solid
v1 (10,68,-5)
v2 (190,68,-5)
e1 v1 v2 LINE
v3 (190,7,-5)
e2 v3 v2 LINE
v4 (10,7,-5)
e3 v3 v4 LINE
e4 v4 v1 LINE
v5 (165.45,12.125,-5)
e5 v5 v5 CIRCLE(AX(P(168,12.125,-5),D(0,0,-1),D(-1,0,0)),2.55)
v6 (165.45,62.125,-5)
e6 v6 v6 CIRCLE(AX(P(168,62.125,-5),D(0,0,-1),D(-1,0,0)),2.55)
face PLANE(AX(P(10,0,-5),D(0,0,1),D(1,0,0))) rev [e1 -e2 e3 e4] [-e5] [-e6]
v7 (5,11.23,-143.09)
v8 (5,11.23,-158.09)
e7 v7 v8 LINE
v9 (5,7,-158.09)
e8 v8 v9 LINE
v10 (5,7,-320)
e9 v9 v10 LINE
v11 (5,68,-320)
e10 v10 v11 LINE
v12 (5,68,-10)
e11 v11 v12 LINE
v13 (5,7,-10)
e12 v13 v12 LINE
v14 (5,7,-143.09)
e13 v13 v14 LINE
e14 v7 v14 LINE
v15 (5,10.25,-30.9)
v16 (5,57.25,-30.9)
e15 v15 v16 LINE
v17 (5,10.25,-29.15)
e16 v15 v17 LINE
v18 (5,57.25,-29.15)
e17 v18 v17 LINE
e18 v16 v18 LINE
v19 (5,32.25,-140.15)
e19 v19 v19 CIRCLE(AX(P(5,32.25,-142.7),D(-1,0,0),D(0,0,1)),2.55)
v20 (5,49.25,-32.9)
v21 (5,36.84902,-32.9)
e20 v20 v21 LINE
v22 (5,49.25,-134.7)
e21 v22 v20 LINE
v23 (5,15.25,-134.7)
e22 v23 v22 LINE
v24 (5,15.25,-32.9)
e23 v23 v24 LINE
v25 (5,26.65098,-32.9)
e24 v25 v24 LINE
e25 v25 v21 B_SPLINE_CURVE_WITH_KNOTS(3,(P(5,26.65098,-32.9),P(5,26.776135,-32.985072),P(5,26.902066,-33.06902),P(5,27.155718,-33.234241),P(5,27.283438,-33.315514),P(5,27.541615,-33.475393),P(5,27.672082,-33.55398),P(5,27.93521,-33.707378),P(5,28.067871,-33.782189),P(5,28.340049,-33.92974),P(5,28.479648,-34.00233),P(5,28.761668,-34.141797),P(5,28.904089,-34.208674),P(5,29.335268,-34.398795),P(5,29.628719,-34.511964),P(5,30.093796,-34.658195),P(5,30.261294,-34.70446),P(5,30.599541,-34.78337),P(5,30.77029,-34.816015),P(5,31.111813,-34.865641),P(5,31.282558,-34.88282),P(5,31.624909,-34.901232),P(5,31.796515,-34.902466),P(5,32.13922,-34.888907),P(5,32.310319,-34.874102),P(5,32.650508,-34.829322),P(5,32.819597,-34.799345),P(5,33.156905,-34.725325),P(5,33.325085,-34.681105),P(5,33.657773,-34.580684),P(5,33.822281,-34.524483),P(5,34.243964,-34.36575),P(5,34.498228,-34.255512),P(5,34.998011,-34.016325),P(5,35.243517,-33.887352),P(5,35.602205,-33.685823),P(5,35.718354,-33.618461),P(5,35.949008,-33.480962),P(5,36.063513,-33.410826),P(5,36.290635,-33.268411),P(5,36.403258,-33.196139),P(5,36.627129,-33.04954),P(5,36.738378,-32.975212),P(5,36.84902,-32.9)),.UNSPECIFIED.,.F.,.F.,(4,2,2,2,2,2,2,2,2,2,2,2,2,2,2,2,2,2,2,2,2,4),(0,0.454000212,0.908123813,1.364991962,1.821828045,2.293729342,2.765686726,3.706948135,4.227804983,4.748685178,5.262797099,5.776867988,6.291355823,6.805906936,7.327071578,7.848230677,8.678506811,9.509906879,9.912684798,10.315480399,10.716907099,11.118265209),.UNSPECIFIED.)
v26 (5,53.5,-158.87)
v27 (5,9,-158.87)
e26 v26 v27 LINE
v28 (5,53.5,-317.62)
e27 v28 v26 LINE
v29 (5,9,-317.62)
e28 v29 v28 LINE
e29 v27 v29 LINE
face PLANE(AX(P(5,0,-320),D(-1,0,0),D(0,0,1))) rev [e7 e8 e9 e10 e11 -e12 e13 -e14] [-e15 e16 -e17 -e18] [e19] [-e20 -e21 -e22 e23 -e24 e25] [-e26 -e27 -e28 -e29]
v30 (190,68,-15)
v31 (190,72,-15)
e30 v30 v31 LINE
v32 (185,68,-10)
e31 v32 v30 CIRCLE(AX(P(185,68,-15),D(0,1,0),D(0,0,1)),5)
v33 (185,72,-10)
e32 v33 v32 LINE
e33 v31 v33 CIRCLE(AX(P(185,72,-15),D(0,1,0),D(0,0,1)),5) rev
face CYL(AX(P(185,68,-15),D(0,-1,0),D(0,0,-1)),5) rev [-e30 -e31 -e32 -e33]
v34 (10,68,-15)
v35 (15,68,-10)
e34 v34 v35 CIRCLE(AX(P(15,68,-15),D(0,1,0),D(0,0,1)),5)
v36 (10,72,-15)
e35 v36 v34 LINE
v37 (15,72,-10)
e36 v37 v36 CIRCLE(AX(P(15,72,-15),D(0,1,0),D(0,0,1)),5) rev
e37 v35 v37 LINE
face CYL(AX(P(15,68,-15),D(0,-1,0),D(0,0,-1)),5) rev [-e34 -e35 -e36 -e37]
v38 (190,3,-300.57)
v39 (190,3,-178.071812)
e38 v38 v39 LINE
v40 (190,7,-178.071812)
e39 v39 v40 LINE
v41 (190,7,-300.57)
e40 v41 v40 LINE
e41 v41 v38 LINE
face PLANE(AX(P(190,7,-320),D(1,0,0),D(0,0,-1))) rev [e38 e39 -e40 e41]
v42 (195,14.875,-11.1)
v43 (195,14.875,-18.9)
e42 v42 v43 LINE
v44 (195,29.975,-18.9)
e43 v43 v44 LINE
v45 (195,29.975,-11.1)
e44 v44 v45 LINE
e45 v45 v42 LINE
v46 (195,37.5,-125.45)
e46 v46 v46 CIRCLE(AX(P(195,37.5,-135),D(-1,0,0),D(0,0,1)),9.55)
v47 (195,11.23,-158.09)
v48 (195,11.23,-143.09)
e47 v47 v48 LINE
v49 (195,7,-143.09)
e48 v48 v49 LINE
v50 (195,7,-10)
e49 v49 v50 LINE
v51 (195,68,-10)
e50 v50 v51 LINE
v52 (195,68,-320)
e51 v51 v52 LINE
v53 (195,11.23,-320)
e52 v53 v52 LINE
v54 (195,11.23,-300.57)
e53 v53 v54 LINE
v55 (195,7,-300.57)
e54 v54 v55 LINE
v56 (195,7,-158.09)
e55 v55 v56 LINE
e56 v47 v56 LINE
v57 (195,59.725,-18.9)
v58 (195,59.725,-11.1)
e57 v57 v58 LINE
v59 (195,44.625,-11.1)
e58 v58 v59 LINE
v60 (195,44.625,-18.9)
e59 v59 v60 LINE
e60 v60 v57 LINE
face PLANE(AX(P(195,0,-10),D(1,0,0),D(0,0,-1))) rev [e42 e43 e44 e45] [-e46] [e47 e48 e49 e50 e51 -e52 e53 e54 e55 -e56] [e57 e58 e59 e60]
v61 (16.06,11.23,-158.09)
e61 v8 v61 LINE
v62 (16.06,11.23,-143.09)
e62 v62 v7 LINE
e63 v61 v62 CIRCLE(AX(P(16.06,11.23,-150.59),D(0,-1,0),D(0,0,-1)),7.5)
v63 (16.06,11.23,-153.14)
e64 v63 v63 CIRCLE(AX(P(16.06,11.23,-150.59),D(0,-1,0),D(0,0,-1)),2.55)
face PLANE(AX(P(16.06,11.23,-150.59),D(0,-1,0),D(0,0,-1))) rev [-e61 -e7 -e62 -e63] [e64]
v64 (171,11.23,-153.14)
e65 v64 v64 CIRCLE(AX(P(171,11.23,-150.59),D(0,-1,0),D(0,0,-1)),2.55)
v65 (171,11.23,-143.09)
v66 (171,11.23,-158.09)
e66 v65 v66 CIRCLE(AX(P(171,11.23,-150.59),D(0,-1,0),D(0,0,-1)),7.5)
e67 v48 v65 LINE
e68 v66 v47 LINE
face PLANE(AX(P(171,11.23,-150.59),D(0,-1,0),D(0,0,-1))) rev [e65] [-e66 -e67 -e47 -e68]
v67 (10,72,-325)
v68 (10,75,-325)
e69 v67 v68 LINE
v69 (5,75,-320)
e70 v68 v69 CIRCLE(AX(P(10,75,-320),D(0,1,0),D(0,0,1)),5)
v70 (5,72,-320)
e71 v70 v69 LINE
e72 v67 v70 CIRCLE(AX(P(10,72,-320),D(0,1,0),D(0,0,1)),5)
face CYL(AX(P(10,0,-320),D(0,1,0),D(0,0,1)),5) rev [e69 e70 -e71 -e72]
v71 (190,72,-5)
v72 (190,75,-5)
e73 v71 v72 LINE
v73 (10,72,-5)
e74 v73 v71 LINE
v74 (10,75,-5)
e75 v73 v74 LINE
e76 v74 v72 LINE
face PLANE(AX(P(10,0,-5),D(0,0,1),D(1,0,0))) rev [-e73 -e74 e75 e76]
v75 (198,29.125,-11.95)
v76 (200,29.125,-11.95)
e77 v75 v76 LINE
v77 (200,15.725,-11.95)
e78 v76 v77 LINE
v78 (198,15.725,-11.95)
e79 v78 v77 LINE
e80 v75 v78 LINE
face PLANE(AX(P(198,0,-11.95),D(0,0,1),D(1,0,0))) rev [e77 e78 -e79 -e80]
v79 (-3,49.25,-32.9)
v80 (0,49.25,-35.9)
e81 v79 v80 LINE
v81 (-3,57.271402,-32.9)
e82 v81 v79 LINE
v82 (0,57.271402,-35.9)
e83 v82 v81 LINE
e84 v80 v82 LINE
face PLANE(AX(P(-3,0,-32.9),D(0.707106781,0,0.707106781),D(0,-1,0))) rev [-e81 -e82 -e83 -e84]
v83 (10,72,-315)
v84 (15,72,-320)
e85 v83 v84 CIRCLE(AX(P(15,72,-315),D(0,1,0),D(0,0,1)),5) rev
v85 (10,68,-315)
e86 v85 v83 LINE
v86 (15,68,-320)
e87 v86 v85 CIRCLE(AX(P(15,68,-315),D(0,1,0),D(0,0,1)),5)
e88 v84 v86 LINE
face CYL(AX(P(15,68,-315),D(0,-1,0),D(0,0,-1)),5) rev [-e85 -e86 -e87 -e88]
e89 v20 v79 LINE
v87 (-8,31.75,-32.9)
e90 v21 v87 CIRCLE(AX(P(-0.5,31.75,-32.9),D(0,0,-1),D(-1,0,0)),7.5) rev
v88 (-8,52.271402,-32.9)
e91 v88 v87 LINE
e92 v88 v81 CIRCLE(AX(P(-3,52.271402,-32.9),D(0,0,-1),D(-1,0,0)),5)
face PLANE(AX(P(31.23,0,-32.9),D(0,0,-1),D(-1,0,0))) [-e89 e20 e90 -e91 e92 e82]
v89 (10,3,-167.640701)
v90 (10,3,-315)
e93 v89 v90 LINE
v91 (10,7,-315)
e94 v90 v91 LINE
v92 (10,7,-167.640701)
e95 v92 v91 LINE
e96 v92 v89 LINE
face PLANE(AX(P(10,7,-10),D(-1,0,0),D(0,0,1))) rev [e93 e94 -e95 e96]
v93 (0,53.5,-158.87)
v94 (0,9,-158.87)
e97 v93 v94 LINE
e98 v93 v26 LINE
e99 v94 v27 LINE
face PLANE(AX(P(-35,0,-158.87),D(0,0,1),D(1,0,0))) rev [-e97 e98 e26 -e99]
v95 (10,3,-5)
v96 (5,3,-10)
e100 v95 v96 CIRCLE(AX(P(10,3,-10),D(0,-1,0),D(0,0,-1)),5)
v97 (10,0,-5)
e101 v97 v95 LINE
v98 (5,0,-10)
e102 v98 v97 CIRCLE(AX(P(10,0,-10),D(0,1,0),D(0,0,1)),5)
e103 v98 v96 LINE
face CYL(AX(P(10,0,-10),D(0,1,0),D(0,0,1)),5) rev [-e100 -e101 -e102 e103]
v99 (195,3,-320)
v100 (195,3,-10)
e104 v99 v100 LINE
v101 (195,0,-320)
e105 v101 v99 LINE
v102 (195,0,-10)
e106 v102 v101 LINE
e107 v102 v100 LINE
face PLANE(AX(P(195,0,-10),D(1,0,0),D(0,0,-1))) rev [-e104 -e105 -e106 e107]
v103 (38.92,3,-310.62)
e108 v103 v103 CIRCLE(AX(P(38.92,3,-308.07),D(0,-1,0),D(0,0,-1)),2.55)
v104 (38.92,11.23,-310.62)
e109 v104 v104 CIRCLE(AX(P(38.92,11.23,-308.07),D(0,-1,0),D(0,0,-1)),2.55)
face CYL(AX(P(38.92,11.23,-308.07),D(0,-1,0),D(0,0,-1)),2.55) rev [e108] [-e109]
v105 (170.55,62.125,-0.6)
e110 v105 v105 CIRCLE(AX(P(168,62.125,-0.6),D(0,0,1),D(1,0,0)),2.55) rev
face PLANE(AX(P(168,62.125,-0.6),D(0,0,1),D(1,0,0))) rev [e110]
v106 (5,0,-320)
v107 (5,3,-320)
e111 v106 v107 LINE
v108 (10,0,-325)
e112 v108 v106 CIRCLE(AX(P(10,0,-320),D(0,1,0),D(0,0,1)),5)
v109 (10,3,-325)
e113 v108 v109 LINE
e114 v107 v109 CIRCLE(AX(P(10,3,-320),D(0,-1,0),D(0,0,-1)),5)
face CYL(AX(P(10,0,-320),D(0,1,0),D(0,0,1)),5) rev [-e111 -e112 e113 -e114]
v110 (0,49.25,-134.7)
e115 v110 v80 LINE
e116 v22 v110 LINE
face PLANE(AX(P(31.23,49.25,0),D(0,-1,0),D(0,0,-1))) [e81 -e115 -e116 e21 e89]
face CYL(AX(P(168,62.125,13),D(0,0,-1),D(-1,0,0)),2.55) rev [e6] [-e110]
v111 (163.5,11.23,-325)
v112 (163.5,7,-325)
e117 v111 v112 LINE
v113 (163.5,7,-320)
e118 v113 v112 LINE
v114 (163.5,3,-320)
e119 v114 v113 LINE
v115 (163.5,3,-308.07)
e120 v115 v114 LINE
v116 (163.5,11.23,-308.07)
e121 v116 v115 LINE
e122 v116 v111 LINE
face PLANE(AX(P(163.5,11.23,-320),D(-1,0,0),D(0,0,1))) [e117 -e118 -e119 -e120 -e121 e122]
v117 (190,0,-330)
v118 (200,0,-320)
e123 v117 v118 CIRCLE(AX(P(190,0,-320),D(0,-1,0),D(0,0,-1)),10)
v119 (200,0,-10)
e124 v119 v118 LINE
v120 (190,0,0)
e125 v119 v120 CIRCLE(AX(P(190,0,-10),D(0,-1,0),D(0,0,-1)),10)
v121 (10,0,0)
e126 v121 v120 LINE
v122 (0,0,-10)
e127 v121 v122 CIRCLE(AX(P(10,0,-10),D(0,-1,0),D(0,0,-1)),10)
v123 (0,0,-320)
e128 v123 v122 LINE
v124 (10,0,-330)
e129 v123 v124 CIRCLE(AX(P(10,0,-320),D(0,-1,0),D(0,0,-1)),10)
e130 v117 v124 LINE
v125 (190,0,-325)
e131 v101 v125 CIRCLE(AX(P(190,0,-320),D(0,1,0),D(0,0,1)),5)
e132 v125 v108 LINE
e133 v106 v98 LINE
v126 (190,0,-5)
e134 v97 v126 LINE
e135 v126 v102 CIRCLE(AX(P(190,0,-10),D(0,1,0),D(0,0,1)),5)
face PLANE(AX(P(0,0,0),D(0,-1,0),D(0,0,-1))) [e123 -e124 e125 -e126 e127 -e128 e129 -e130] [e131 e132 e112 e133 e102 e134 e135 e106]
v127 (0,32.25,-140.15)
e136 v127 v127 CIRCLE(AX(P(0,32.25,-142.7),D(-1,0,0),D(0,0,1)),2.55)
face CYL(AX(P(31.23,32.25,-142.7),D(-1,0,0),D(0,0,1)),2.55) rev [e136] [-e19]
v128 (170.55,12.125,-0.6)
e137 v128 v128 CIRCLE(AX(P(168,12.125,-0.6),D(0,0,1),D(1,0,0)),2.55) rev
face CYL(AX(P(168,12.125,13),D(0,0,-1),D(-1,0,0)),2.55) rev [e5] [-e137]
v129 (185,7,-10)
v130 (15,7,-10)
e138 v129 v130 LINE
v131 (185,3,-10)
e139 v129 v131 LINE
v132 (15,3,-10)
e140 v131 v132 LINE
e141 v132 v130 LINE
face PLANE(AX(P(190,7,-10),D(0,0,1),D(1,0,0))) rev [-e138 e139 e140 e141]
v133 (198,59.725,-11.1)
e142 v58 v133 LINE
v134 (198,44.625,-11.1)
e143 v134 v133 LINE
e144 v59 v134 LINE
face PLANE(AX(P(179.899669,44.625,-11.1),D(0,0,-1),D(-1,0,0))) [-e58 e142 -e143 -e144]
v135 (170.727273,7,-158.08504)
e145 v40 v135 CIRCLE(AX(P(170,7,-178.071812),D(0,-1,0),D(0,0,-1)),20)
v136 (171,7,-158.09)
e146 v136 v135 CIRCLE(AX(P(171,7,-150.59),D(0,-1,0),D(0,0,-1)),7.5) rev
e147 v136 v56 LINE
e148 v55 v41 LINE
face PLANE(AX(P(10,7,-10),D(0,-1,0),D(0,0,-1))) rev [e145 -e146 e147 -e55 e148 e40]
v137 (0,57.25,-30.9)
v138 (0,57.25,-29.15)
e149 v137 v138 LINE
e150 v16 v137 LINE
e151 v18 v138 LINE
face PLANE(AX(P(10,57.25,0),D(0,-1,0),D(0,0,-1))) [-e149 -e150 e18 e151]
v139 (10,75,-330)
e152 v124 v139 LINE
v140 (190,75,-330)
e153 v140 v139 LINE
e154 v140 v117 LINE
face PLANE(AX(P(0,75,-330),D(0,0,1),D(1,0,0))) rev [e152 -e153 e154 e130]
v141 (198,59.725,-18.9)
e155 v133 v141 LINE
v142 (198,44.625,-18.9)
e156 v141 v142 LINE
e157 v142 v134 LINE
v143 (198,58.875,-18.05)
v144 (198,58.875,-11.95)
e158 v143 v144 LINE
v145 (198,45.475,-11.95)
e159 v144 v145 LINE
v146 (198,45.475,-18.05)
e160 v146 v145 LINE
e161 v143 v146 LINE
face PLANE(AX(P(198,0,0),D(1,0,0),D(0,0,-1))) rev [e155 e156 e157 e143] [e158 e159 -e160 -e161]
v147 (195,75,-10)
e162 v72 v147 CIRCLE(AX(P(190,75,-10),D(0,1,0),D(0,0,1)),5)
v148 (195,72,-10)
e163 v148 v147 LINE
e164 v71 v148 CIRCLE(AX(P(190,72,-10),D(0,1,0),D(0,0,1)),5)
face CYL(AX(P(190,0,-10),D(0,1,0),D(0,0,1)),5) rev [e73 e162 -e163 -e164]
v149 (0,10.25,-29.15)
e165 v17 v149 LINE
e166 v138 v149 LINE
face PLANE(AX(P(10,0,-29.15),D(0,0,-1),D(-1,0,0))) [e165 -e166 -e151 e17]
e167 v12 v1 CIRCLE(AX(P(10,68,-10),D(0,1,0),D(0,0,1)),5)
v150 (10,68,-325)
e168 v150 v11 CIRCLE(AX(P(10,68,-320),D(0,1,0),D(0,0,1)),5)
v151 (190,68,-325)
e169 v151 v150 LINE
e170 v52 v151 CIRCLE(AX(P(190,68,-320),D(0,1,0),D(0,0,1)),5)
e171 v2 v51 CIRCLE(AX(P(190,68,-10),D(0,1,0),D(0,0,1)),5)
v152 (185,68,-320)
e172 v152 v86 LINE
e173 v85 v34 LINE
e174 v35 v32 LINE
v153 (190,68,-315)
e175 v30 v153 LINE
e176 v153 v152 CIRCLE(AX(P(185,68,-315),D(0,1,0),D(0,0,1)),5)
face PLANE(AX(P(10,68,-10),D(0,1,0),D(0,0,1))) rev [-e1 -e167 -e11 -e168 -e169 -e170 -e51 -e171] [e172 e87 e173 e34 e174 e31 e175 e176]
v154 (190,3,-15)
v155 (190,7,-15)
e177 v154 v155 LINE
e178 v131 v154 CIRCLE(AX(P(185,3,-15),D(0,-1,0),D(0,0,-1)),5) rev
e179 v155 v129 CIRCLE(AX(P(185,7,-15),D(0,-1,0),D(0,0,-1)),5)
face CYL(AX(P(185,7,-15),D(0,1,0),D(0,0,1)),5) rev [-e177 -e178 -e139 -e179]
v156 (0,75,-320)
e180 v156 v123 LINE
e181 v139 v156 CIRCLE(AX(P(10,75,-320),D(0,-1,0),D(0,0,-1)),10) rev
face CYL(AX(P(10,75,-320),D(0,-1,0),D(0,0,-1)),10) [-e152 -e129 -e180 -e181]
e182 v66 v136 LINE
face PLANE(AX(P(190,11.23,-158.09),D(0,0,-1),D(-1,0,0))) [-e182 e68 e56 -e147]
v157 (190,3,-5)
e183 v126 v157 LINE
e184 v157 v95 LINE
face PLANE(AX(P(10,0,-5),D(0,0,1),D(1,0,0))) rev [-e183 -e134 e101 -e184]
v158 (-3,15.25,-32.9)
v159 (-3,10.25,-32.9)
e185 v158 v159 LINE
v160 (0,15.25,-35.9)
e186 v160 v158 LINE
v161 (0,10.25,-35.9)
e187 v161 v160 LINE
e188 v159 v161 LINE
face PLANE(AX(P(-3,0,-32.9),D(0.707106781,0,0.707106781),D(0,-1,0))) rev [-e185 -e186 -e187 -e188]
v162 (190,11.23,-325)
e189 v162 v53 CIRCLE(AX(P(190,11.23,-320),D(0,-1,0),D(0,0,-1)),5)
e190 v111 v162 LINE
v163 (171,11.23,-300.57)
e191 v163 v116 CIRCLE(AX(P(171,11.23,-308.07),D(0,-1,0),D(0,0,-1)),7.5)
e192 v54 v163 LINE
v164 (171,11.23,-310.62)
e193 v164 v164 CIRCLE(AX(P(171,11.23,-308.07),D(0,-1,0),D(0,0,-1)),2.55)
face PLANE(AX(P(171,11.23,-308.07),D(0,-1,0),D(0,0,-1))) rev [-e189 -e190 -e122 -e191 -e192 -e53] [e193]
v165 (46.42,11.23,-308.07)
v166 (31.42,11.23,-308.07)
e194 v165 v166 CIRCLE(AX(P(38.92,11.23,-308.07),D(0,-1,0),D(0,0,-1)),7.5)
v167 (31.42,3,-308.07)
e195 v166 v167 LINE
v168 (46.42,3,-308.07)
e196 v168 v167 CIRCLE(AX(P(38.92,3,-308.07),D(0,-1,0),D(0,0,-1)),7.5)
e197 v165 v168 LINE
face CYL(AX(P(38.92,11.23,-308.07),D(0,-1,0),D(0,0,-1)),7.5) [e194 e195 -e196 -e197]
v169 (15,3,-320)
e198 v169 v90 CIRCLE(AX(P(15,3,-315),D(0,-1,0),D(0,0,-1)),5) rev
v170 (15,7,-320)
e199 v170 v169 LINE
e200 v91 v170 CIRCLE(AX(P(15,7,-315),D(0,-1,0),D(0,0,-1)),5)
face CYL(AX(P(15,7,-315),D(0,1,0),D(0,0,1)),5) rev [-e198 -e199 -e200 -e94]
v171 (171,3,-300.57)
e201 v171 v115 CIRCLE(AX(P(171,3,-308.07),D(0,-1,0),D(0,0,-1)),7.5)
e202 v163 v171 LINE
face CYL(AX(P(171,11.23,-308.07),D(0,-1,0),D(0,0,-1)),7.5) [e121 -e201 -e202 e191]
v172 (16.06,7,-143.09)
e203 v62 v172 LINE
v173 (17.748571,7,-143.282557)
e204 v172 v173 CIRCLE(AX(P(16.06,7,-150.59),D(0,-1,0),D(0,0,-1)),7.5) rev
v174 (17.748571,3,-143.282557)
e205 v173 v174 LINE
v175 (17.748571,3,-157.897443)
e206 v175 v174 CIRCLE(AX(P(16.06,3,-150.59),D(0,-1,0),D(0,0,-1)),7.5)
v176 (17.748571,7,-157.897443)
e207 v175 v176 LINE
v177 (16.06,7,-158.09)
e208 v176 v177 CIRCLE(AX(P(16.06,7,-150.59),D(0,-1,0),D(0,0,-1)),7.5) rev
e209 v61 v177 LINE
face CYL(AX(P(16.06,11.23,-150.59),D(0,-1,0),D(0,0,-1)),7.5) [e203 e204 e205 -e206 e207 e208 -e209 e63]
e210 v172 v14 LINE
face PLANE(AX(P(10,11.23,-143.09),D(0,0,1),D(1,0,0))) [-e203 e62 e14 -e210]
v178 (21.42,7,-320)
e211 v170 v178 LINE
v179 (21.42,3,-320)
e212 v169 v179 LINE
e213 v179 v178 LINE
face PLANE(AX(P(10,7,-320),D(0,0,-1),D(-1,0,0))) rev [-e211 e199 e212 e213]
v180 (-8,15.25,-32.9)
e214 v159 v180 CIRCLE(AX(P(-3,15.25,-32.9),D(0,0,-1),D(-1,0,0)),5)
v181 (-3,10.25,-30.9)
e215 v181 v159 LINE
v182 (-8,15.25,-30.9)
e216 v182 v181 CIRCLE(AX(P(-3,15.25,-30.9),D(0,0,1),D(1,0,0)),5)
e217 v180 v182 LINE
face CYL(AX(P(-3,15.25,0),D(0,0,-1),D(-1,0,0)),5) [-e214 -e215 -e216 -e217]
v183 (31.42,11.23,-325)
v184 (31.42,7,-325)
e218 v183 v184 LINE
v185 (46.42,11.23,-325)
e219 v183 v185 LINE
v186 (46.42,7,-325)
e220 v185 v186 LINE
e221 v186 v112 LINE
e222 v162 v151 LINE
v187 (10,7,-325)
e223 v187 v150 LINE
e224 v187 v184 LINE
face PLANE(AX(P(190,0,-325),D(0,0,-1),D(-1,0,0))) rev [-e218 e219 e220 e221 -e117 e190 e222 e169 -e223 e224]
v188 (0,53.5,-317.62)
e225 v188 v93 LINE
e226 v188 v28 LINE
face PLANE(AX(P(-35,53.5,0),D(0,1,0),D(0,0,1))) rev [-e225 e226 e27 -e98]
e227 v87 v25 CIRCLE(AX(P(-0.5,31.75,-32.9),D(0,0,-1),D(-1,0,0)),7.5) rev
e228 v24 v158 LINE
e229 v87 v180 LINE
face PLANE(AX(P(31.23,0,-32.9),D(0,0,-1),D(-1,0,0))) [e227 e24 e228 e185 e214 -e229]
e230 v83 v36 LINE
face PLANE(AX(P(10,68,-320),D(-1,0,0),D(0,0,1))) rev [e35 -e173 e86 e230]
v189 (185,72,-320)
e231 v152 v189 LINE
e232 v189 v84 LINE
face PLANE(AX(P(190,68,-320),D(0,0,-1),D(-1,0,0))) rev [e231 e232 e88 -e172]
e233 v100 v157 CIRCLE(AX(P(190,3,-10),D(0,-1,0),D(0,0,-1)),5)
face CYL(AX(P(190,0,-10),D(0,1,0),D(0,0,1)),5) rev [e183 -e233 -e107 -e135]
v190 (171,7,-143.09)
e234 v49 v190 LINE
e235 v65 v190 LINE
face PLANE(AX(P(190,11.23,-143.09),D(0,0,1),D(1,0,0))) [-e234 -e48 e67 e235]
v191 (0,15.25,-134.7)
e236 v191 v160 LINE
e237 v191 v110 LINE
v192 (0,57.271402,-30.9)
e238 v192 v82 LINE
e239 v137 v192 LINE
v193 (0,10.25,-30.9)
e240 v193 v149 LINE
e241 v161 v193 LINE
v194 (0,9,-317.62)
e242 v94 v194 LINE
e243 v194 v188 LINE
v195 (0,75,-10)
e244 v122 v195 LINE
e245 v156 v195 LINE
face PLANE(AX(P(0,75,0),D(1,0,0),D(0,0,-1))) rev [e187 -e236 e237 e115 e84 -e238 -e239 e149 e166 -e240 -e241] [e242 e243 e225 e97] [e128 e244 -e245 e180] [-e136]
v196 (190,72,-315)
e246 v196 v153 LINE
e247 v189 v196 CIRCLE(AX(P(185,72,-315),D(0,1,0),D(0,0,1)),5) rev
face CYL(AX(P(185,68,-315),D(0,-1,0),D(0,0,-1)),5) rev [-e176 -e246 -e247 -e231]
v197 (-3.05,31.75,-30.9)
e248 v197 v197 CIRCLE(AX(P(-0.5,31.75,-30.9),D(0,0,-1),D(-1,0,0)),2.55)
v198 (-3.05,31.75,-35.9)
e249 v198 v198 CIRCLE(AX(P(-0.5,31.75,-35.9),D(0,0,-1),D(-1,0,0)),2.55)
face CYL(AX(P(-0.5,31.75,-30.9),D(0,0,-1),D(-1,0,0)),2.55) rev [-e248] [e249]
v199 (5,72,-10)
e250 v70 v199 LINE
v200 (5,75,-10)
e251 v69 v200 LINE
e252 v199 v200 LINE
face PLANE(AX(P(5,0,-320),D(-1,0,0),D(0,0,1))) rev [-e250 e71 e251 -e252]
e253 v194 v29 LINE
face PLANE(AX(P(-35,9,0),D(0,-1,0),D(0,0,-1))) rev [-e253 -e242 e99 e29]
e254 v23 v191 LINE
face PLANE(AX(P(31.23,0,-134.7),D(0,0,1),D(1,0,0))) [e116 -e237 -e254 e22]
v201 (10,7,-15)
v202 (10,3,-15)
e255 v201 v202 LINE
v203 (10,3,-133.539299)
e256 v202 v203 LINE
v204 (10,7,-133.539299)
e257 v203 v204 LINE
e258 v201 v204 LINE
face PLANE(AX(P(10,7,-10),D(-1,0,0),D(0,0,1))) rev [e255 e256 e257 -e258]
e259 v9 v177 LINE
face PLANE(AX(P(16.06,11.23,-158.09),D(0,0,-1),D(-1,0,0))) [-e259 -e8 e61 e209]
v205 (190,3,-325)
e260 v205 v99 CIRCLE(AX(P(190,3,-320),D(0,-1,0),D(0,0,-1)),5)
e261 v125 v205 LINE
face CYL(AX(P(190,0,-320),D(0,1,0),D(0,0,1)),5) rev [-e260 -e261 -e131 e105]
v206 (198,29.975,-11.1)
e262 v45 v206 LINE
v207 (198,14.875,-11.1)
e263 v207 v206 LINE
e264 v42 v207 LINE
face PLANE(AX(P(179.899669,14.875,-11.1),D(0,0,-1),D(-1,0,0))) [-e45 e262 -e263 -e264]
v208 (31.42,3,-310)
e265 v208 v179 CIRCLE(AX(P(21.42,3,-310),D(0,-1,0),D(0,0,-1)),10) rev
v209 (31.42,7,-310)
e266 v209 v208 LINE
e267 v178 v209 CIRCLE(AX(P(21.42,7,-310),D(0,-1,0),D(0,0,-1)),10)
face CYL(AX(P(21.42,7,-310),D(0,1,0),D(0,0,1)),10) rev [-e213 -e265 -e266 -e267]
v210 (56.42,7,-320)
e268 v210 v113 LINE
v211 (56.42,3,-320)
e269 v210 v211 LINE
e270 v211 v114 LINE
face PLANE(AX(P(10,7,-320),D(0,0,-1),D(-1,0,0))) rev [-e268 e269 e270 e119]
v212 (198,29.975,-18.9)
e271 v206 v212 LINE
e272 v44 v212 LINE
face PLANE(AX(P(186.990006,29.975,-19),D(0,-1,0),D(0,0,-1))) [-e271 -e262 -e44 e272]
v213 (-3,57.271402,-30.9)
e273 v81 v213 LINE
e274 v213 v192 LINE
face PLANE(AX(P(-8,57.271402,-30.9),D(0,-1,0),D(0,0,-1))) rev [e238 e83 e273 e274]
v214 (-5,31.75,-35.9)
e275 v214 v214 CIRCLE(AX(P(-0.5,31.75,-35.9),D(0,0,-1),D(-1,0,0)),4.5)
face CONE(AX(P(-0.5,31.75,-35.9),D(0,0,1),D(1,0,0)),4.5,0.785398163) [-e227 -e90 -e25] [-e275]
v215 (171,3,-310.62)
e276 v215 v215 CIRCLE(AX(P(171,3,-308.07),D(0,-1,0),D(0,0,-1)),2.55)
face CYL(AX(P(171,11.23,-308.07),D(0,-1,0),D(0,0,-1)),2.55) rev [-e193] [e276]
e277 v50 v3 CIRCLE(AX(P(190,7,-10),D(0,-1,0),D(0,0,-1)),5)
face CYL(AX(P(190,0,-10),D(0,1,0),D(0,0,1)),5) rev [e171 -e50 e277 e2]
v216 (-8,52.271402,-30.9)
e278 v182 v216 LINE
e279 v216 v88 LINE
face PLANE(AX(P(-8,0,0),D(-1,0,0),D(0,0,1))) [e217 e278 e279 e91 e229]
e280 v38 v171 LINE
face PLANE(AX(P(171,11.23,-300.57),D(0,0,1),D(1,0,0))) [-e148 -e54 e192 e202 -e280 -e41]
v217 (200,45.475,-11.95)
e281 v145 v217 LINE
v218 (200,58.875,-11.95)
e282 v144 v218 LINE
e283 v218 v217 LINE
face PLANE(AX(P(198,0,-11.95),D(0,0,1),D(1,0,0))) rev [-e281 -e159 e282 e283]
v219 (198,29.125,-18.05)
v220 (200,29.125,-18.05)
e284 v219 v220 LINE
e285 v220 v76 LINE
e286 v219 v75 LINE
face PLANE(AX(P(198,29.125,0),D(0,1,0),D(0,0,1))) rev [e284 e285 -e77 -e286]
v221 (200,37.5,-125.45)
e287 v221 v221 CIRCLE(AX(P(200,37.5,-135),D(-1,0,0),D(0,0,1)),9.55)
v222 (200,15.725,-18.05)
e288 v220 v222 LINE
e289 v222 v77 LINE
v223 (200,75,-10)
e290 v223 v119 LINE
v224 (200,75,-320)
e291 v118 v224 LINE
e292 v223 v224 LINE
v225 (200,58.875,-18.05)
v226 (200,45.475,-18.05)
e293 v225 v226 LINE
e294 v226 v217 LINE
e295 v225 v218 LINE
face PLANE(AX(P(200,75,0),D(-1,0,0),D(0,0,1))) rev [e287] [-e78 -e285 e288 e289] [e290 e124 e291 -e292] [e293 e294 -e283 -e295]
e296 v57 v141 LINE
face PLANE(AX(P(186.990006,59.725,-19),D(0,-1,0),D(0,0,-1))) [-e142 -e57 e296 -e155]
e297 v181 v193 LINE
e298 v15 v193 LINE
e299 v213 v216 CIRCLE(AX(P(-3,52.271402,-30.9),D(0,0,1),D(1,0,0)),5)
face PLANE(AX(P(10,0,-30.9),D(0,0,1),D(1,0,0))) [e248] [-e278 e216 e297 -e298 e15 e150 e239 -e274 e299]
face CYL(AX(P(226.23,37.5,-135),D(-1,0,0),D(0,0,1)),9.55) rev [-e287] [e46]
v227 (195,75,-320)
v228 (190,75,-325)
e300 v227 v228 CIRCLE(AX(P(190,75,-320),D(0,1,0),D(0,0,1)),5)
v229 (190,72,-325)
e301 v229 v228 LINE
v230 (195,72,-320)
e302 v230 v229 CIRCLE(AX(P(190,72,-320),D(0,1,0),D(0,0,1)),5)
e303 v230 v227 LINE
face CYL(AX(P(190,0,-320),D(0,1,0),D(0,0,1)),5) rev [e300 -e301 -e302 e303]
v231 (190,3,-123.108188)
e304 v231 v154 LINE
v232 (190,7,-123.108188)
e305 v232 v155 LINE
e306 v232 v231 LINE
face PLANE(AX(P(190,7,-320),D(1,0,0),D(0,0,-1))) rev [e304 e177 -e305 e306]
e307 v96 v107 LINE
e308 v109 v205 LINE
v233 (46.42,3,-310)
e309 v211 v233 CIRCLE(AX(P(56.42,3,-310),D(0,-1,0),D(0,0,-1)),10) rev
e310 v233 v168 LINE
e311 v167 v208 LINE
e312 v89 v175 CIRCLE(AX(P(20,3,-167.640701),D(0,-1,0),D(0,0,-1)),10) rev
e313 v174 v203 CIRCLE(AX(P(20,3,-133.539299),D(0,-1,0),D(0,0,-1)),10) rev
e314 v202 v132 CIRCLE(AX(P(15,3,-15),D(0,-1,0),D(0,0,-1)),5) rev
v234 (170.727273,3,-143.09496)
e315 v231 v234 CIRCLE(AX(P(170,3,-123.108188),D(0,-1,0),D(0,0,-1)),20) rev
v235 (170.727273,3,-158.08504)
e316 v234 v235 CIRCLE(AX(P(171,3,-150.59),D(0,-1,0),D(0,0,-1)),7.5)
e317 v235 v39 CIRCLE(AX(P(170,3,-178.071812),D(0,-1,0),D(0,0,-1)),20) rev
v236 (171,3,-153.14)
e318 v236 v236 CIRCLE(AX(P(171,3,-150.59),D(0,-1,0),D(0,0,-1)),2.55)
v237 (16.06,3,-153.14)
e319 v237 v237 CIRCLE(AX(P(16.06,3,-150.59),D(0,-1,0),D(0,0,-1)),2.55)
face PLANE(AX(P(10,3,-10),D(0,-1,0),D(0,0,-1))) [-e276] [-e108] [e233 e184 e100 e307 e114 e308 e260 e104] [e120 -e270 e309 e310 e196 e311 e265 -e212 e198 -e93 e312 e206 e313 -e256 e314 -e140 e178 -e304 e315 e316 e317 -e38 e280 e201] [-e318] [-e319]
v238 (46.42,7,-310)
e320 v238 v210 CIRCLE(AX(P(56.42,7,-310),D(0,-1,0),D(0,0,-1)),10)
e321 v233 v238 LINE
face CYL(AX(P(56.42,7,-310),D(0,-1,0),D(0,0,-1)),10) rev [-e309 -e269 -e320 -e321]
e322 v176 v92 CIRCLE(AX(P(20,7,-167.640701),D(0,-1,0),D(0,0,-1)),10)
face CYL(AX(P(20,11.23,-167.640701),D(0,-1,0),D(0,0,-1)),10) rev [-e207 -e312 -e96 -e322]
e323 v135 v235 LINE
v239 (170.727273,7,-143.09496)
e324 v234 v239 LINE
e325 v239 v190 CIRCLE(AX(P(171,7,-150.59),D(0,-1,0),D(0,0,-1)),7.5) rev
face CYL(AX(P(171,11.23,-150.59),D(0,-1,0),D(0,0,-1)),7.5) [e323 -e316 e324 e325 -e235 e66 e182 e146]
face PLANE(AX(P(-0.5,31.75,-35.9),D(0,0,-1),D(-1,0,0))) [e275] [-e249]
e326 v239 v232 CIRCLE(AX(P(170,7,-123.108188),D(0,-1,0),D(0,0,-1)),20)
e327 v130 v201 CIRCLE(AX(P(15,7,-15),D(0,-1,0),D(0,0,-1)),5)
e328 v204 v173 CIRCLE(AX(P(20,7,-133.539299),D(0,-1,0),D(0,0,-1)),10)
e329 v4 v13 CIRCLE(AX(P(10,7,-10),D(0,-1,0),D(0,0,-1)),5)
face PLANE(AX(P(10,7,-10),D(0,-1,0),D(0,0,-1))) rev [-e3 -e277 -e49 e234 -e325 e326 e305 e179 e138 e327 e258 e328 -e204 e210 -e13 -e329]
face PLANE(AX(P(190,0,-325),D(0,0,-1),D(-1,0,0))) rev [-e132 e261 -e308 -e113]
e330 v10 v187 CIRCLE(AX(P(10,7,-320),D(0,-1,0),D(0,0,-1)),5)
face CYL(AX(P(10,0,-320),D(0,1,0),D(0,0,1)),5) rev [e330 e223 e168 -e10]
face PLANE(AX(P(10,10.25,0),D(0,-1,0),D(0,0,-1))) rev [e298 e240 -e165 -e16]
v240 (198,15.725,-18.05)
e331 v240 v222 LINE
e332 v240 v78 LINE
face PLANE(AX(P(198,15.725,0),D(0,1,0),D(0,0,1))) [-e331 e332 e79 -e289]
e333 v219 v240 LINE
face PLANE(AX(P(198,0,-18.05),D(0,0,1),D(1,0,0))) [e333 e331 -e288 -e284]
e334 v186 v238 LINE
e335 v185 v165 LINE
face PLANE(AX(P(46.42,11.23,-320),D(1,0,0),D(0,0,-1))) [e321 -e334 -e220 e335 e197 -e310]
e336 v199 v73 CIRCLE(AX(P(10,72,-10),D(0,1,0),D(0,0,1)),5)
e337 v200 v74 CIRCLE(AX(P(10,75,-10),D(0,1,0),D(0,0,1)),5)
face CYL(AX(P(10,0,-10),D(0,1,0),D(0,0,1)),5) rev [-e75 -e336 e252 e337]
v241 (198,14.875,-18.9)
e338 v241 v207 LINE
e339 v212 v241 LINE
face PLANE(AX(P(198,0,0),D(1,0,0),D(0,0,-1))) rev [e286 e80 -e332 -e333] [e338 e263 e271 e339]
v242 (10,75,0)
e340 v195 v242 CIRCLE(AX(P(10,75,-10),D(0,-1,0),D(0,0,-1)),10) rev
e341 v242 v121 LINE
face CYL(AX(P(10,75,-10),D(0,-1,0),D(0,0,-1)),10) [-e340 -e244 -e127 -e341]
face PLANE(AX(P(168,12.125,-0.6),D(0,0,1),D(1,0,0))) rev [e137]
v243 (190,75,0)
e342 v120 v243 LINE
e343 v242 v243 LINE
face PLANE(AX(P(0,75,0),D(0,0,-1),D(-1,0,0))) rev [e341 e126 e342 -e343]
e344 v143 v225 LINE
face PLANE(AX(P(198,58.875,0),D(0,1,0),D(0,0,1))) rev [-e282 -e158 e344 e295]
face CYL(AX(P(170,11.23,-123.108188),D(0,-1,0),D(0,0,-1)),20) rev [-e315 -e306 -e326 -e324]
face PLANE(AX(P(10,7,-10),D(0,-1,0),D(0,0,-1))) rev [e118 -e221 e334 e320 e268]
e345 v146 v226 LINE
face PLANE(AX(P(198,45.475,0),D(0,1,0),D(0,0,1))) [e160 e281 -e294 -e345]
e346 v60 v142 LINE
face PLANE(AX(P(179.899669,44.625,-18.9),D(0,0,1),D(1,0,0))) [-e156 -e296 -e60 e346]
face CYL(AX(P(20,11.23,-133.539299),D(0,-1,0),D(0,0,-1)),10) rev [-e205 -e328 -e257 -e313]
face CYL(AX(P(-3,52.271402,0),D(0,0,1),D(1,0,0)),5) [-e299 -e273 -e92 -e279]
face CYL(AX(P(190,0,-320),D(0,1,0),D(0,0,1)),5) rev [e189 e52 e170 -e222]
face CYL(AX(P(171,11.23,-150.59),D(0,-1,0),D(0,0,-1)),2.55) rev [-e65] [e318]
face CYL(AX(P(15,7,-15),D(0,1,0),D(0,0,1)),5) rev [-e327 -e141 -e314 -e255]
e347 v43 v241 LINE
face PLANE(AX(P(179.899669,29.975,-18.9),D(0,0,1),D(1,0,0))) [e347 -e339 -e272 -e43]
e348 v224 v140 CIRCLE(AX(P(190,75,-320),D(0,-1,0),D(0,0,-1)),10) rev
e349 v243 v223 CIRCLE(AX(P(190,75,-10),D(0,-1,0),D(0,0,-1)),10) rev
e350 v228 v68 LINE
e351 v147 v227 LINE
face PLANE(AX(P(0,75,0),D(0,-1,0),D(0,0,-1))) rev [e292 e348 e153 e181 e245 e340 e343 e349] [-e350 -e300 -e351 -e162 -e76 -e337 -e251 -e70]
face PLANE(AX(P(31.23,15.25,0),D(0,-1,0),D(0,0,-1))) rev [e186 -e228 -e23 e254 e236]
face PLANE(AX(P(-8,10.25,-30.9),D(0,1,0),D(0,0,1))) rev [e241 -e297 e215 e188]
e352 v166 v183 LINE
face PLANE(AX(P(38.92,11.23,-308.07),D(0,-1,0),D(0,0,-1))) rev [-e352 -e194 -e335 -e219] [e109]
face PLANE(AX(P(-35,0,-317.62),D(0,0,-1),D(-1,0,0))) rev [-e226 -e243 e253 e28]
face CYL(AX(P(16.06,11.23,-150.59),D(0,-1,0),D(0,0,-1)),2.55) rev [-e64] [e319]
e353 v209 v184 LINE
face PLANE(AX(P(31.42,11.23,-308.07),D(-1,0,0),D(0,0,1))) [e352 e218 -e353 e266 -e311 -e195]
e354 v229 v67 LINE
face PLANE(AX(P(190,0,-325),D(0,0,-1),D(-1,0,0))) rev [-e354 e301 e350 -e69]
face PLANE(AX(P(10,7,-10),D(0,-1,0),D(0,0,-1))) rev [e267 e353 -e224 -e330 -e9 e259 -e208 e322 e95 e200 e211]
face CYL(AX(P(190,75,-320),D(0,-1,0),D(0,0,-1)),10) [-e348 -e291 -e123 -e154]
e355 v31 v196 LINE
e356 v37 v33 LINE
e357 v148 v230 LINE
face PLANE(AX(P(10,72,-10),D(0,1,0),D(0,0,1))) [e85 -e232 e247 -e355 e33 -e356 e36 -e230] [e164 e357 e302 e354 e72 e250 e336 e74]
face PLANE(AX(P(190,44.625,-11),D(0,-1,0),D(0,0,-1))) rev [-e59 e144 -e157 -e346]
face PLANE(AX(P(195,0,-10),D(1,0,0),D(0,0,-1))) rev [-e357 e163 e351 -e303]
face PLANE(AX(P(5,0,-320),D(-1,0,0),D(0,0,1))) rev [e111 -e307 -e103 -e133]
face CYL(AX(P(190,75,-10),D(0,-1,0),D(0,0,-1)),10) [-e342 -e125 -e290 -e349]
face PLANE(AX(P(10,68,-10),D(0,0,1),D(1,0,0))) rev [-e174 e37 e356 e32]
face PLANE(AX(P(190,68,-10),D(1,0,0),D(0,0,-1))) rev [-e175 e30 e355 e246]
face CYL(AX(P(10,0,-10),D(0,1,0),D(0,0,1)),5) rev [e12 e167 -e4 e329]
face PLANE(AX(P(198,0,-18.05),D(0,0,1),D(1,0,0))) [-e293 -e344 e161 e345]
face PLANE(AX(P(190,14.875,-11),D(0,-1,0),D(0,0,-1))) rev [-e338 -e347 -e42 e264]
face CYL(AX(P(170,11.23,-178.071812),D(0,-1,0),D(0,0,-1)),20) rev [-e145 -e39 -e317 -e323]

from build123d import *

# Parameters (mm, degrees)
SKETCH1_W            = 200
SKETCH1_H            = 330
BOSS_EXTRUDE1_DEPTH  = 75
FILLET1_R            = 10
CUT_EXTRUDE1_DEPTH   = 75
SKETCH3_W            = 180
SKETCH3_H            = 310
BOSS_EXTRUDE2_DEPTH  = 4
BOSS_EXTRUDE3_START  = -4
SKETCH4_W            = 180
SKETCH4_H            = 310
BOSS_EXTRUDE3_DEPTH  = 4
SKETCH8_W            = 158.75
SKETCH8_H            = 44.5
CUT_EXTRUDE2_DEPTH   = 40
BOSS_EXTRUDE4_START  = -8.23
SKETCH11_R           = 2.55
BOSS_EXTRUDE4_DEPTH  = 8.23
SKETCH12_R           = 2.55
SKETCH12_W           = 101.8
SKETCH12_H           = 34
CUT_EXTRUDE3_DEPTH   = 31.23
SKETCH13_R           = 9.55
CUT_EXTRUDE4_DEPTH   = 31.23
FILLET2_R            = 10
FILLET3_R            = 20
FILLET4_R            = 5
CUT_EXTRUDE5_DEPTH   = 10
SKETCH15_W           = 2
SKETCH15_H           = 47.02140159
BOSS_EXTRUDE5_DEPTH  = 8
SKETCH16_R           = 2.55
CUT_EXTRUDE6_DEPTH   = 2
BOSS_EXTRUDE6_START  = 3
SKETCH17_R           = 4.5
SKETCH17_R_2         = 2.55
BOSS_EXTRUDE6_DEPTH  = 3
CHAMFER1_SIZE        = 3
FILLET5_R            = 5
CHAMFER2_SIZE        = 3
SKETCH19_W           = 7
SKETCH19_H           = 14.5
CUT_EXTRUDE8_DEPTH   = 18
SKETCH22_W           = 7
SKETCH22_H           = 0.375
CUT_EXTRUDE9_DEPTH   = 18
SKETCH23_W           = 7
SKETCH23_H           = 0.375
BOSS_EXTRUDE7_DEPTH  = 5
SKETCH20_R           = 2.55
CUT_EXTRUDE10_DEPTH  = 18
SKETCH24_W           = 8
SKETCH24_H           = 15.5
CUT_EXTRUDE12_DEPTH  = 10
SKETCH25_W           = 8
SKETCH25_H           = 0.4
BOSS_EXTRUDE8_DEPTH  = 5
SKETCH26_W           = 0.1
SKETCH26_H           = 15.1
BOSS_EXTRUDE9_DEPTH  = 5
BOSS_EXTRUDE10_DEPTH = 2
SKETCH28_W           = 12.985784693
SKETCH28_H           = 10.415883014
BOSS_EXTRUDE11_DEPTH = 5
BOSS_EXTRUDE12_START = -0.6
SKETCH29_R           = 2.55
BOSS_EXTRUDE12_DEPTH = 0.6


with BuildPart() as part:
    # Sketch1 → Boss-Extrude1 (new body)
    with BuildSketch(Plane(origin=(0, 0, 0), x_dir=(1, 0, 0), z_dir=(0, 1, 0))):
        with Locations((100, 165)):
            Rectangle(SKETCH1_W, SKETCH1_H)
    extrude(amount=BOSS_EXTRUDE1_DEPTH)

    # Fillet1
    fillet1_edges = [part.edges().sort_by_distance(p)[0] for p in [
        (0, 37.5, -330),
        (200, 37.5, -330),
        (200, 37.5, 0),
        (0, 37.5, 0),
    ]]
    fillet(fillet1_edges, radius=FILLET1_R)

    # Sketch2 → Cut-Extrude1 (cut)
    with BuildSketch(Plane(origin=(0, 75, 0), x_dir=(1, 0, 0), z_dir=(0, 1, 0))):
        with BuildLine():
            Line((190, 325), (10, 325))
            ThreePointArc((10, 325), (6.464466094, 323.535533906), (5, 320))
            Line((5, 320), (5, 10))
            ThreePointArc((5, 10), (6.464466094, 6.464466094), (10, 5))
            Line((10, 5), (190, 5))
            ThreePointArc((190, 5), (193.535533906, 6.464466094), (195, 10))
            Line((195, 10), (195, 320))
            ThreePointArc((195, 320), (193.535533906, 323.535533906), (190, 325))
        make_face()
    extrude(amount=-CUT_EXTRUDE1_DEPTH, mode=Mode.SUBTRACT)

    # Sketch3 → Boss-Extrude2 (add)
    with BuildSketch(Plane(origin=(0, 72, 0), x_dir=(1, 0, 0), z_dir=(0, 1, 0))):
        with BuildLine():
            Line((10, 5), (190, 5))
            ThreePointArc((190, 5), (193.535533906, 6.464466094), (195, 10))
            Line((195, 10), (195, 320))
            ThreePointArc((195, 320), (193.535533906, 323.535533906), (190, 325))
            Line((190, 325), (10, 325))
            ThreePointArc((10, 325), (6.464466094, 323.535533906), (5, 320))
            Line((5, 320), (5, 10))
            ThreePointArc((5, 10), (6.464466094, 6.464466094), (10, 5))
        make_face()
        with Locations((100, 165)):
            Rectangle(SKETCH3_W, SKETCH3_H, mode=Mode.SUBTRACT)
    extrude(amount=-BOSS_EXTRUDE2_DEPTH)

    # Sketch4 → Boss-Extrude3 (add)
    with BuildSketch(Plane(origin=(0, 3, 0), x_dir=(-1, 0, 0), z_dir=(0, -1, 0)).offset(BOSS_EXTRUDE3_START)):
        with BuildLine():
            Line((-5, 10), (-5, 320))
            ThreePointArc((-5, 320), (-6.464466094, 323.535533906), (-10, 325))
            Line((-10, 325), (-190, 325))
            ThreePointArc((-190, 325), (-193.535533906, 323.535533906), (-195, 320))
            Line((-195, 320), (-195, 10))
            ThreePointArc((-195, 10), (-193.535533906, 6.464466094), (-190, 5))
            Line((-190, 5), (-10, 5))
            ThreePointArc((-10, 5), (-6.464466094, 6.464466094), (-5, 10))
        make_face()
        with Locations((-100, 165)):
            Rectangle(SKETCH4_W, SKETCH4_H, mode=Mode.SUBTRACT)
    extrude(amount=BOSS_EXTRUDE3_DEPTH)

    # Sketch8 → Cut-Extrude2 (cut)
    with BuildSketch(Plane(origin=(5, 0, 0), x_dir=(0, 0, -1), z_dir=(1, 0, 0))):
        with Locations((238.245, 31.25)):
            Rectangle(SKETCH8_W, SKETCH8_H)
    extrude(amount=-CUT_EXTRUDE2_DEPTH, mode=Mode.SUBTRACT)

    # Sketch11 → Boss-Extrude4 (add)
    # profile 1 of 4: a face of its own
    with BuildSketch(Plane.XZ.offset(-3).offset(BOSS_EXTRUDE4_START)):
        with BuildLine():
            Line((16.06, -158.09), (10, -158.09))
            Line((10, -158.09), (5, -158.09))
            Line((5, -158.09), (5, -143.09))
            Line((5, -143.09), (10, -143.09))
            Line((10, -143.09), (16.06, -143.09))
            ThreePointArc((16.06, -143.09), (23.56, -150.59), (16.06, -158.09))
        make_face()
        with Locations(Location((16.06, -150.59, 0), (0, 0, 270))):
            Circle(SKETCH11_R, mode=Mode.SUBTRACT)
    # profile 2 of 4: a face of its own
    with BuildSketch(Plane.XZ.offset(-3).offset(BOSS_EXTRUDE4_START)):
        with BuildLine():
            Line((31.42, -308.07), (31.42, -320))
            Line((31.42, -320), (31.42, -325))
            Line((31.42, -325), (46.42, -325))
            Line((46.42, -325), (46.42, -320))
            Line((46.42, -320), (46.42, -308.07))
            ThreePointArc((46.42, -308.07), (38.92, -300.57), (31.42, -308.07))
        make_face()
        with Locations(Location((38.92, -308.07, 0), (0, 0, 270))):
            Circle(SKETCH11_R, mode=Mode.SUBTRACT)
    # profile 3 of 4: a face of its own
    with BuildSketch(Plane.XZ.offset(-3).offset(BOSS_EXTRUDE4_START)):
        with BuildLine():
            Line((171, -300.57), (190, -300.57))
            Line((190, -300.57), (195, -300.57))
            Line((195, -300.57), (195, -320))
            ThreePointArc((195, -320), (193.535533906, -323.535533906), (190, -325))
            Line((190, -325), (163.5, -325))
            Line((163.5, -325), (163.5, -320))
            Line((163.5, -320), (163.5, -308.07))
            ThreePointArc((163.5, -308.07), (165.696699141, -302.766699141), (171, -300.57))
        make_face()
        with Locations(Location((171, -308.07, 0), (0, 0, 270))):
            Circle(SKETCH11_R, mode=Mode.SUBTRACT)
    # profile 4 of 4: a face of its own
    with BuildSketch(Plane.XZ.offset(-3).offset(BOSS_EXTRUDE4_START)):
        with BuildLine():
            Line((171, -158.09), (190, -158.09))
            Line((190, -158.09), (195, -158.09))
            Line((195, -158.09), (195, -143.09))
            Line((195, -143.09), (190, -143.09))
            Line((190, -143.09), (171, -143.09))
            ThreePointArc((171, -143.09), (163.5, -150.59), (171, -158.09))
        make_face()
        with Locations(Location((171, -150.59, 0), (0, 0, 270))):
            Circle(SKETCH11_R, mode=Mode.SUBTRACT)
    extrude(amount=BOSS_EXTRUDE4_DEPTH)

    # Sketch12 → Cut-Extrude3 (cut)
    with BuildSketch(Plane.ZY):
        with Locations((-142.7, 32.25)):
            Circle(SKETCH12_R)
        with Locations((-83.8, 32.25)):
            Rectangle(SKETCH12_W, SKETCH12_H)
    extrude(amount=-CUT_EXTRUDE3_DEPTH, mode=Mode.SUBTRACT)

    # Sketch13 → Cut-Extrude4 (cut)
    with BuildSketch(Plane.ZY.offset(-195)):
        with Locations((-135, 37.5)):
            Circle(SKETCH13_R)
    extrude(amount=-CUT_EXTRUDE4_DEPTH, mode=Mode.SUBTRACT)

    # Fillet2
    # the kernel refuses this fillet: 10 mm, written as the material it adds along each edge
    with BuildSketch(Plane(origin=(31.42, 3, -320), x_dir=(0, 0, 1), z_dir=(0, 1, 0))) as fillet2_piece_1:
        with BuildLine():
            CenterArc((FILLET2_R, -FILLET2_R), FILLET2_R, 90, 90)
            Line((0, -FILLET2_R), (0, 0))
            Line((0, 0), (FILLET2_R, 0))
        make_face()
    extrude(amount=4)
    with BuildSketch(Plane(origin=(46.42, 7, -320), x_dir=(1, 0, 0), z_dir=(0, -1, 0))) as fillet2_piece_2:
        with BuildLine():
            CenterArc((FILLET2_R, FILLET2_R), FILLET2_R, 180, 90)
            Line((0, FILLET2_R), (0, 0))
            Line((0, 0), (FILLET2_R, 0))
        make_face()
    extrude(amount=4)
    with BuildSketch(Plane(origin=(10, 7, -143.09), x_dir=(0.9996913663867205, 0, -0.02484294611859972), z_dir=(0, -1, 0))) as fillet2_piece_3:
        with BuildLine():
            CenterArc((9.759646117, 9.796182659), FILLET2_R, 181.423542417, 76.988721184)
            Line((-0.237267547, 9.547753198), (-1.236958913, 9.522910252))
            Line((-1.236958913, 9.522910252), (-0.999691366, -0.024842946))
            Line((-0.999691366, -0.024842946), (0.024842946, -0.999691366))
            ThreePointArc((0.024842946, -0.999691366), (6.082972626, -0.849143113), (7.550095388, -0.979618266))
            Line((7.550095388, -0.979618266), (7.750963636, 0))
        make_face()
    extrude(amount=4)
    with BuildSketch(Plane(origin=(10, 3, -158.09), x_dir=(0, 0, -1), z_dir=(0, 1, 0))) as fillet2_piece_4:
        with BuildLine():
            CenterArc((9.550700865, -10), FILLET2_R, 90, 76.988721184)
            Line((-0.192556772, -7.748571429), (-1.166882536, -7.523428571))
            ThreePointArc((-1.166882536, -7.523428571), (-1, -6.06), (-1, 0))
            Line((-1, 0), (0, 1))
            Line((0, 1), (9.550700865, 1))
            Line((9.550700865, 1), (9.550700865, 0))
        make_face()
    extrude(amount=4)

    # Fillet3
    # the kernel refuses this fillet: 20 mm, written as the material it adds along each edge
    with BuildSketch(Plane(origin=(190, 7, -143.09), x_dir=(-0.9999999668790588, 0, -0.00025737498219353277), z_dir=(0, -1, 0))) as fillet3_piece_1:
        with BuildLine():
            CenterArc((19.994856519, -19.986959005), FILLET3_R, 92.069195834, 87.916057665)
            Line((-0.005142819, -19.981811506), (-2.005142752, -19.981296756))
            Line((-2.005142752, -19.981296756), (-1.999999934, 0.00051475))
            Line((-1.999999934, 0.00051475), (0.00051475, 1.999999934))
            ThreePointArc((0.00051475, 1.999999934), (19.000514121, 1.995109809), (19.20051505, 1.998695901))
            Line((19.20051505, 1.998695901), (19.272727911, 0))
        make_face()
    extrude(amount=4)
    with BuildSketch(Plane(origin=(190, 3, -158.09), x_dir=(0, 0, -1), z_dir=(0, 1, 0))) as fillet3_piece_2:
        with BuildLine():
            CenterArc((19.981812167, 20), FILLET3_R, 182.083942335, 87.916057665)
            Line((-0.004960318, 19.272727273), (-2.003637567, 19.2))
            ThreePointArc((-2.003637567, 19.2), (-2, 19), (-2, 0))
            Line((-2, 0), (0, -2))
            Line((0, -2), (19.981812167, -2))
            Line((19.981812167, -2), (19.981812167, 0))
        make_face()
    extrude(amount=4)

    # Fillet4
    fillet4_edges = [part.edges().sort_by_distance(p)[0] for p in [
        (10, 5, -320),
        (10, 5, -10),
        (190, 5, -10),
        (10, 70, -10),
        (10, 70, -320),
        (190, 70, -320),
        (190, 70, -10),
    ]]
    fillet(fillet4_edges, radius=FILLET4_R)

    # Sketch14 → Cut-Extrude5 (cut)
    with BuildSketch(Plane.ZY):
        Polygon((-30.9, 49.25), (-30.9, 15.25), (-30.9, 10.25), (-29.15, 10.25), (-29.15, 57.25), (-30.9, 57.25), align=None)
    extrude(amount=-CUT_EXTRUDE5_DEPTH, mode=Mode.SUBTRACT)

    # Sketch15 → Boss-Extrude5 (add)
    with BuildSketch(Plane.ZY):
        with Locations((-31.9, 33.760700795)):
            Rectangle(SKETCH15_W, SKETCH15_H)
    extrude(amount=BOSS_EXTRUDE5_DEPTH)

    # Sketch16 → Cut-Extrude6 (cut)
    with BuildSketch(Plane(origin=(0, 0, -32.9), x_dir=(-1, 0, 0), z_dir=(0, 0, -1))):
        with Locations((0.5, 31.75)):
            Circle(SKETCH16_R)
    extrude(amount=-CUT_EXTRUDE6_DEPTH, mode=Mode.SUBTRACT)

    # Sketch17 → Boss-Extrude6 (add)
    with BuildSketch(Plane(origin=(0, 0, -32.9), x_dir=(-1, 0, 0), z_dir=(0, 0, -1)).offset(BOSS_EXTRUDE6_START)):
        with Locations((0.5, 31.75)):
            Circle(SKETCH17_R)
        with Locations((0.5, 31.75)):
            Circle(SKETCH17_R_2, mode=Mode.SUBTRACT)
    extrude(amount=-BOSS_EXTRUDE6_DEPTH)

    # Chamfer1
    # the kernel refuses this chamfer: 3 mm, written as the material it adds along each edge
    with BuildSketch(Plane(origin=(-0.5, 31.75, -32.9), x_dir=(-1, 0, 0), z_dir=(0, -1, 0))) as chamfer1_piece_1_section:
        Polygon((4.5, CHAMFER1_SIZE), (4.5 + CHAMFER1_SIZE, 0), (4.5, 0), align=None)
    chamfer1_piece_1 = revolve(axis=Axis((-0.5, 31.75, -32.9), (0, 0, -1)), mode=Mode.PRIVATE)
    chamfer1_piece_1 = split(chamfer1_piece_1, bisect_by=Plane(origin=(5, 36.059247984, -35.347606696), z_dir=(-1, 0, 0)), keep=Keep.TOP, mode=Mode.PRIVATE)
    chamfer1_piece_1 = split(chamfer1_piece_1, bisect_by=Plane(origin=(-8, 36.059247984, -35.347606696), z_dir=(1, 0, 0)), keep=Keep.TOP, mode=Mode.PRIVATE)
    chamfer1_piece_1 = split(chamfer1_piece_1, bisect_by=Plane(origin=(-2.987945483, 36.059247984, -35.9), z_dir=(0, 0, 1)), keep=Keep.TOP, mode=Mode.PRIVATE)
    add(chamfer1_piece_1)

    # Fillet5
    fillet5_edges = [part.edges().sort_by_distance(p)[0] for p in [
        (-8, 57.27140159, -31.9),
        (-8, 10.25, -31.9),
    ]]
    fillet(fillet5_edges, radius=FILLET5_R)

    # Chamfer2
    chamfer2_edges = [part.edges().sort_by_distance(p)[0] for p in [
        (0, 53.260700795, -32.9),
        (0, 12.75, -32.9),
    ]]
    chamfer(chamfer2_edges, length=CHAMFER2_SIZE)

    # Sketch19 → Cut-Extrude8 (cut)
    with BuildSketch(Plane(origin=(200, 0, 0), x_dir=(0, 0, -1), z_dir=(1, 0, 0))):
        with Locations((15, 52)):
            Rectangle(SKETCH19_W, SKETCH19_H)
        with Locations((15, 22.25)):
            Rectangle(SKETCH19_W, SKETCH19_H)
    extrude(amount=-CUT_EXTRUDE8_DEPTH, mode=Mode.SUBTRACT)

    # Sketch22 → Cut-Extrude9 (cut)
    with BuildSketch(Plane(origin=(200, 0, 0), x_dir=(0, 0, -1), z_dir=(1, 0, 0))):
        with Locations((15, 59.4375)):
            Rectangle(SKETCH22_W, SKETCH22_H)
        with Locations((15, 29.6875)):
            Rectangle(SKETCH22_W, SKETCH22_H)
    extrude(amount=-CUT_EXTRUDE9_DEPTH, mode=Mode.SUBTRACT)

    # Sketch23 → Boss-Extrude7 (add)
    with BuildSketch(Plane(origin=(200, 0, 0), x_dir=(0, 0, -1), z_dir=(1, 0, 0))):
        with Locations((15, 44.9375)):
            Rectangle(SKETCH23_W, SKETCH23_H)
        with Locations((15, 15.1875)):
            Rectangle(SKETCH23_W, SKETCH23_H)
    extrude(amount=-BOSS_EXTRUDE7_DEPTH)

    # Sketch20 → Cut-Extrude10 (cut)
    with BuildSketch(Plane(origin=(0, 0, -5), x_dir=(-1, 0, 0), z_dir=(0, 0, -1))):
        with Locations((-178, 37.125)):
            Circle(SKETCH20_R)
        with Locations((-168, 62.125)):
            Circle(SKETCH20_R)
        with Locations((-168, 12.125)):
            Circle(SKETCH20_R)
    extrude(amount=-CUT_EXTRUDE10_DEPTH, mode=Mode.SUBTRACT)

    # Sketch24 → Cut-Extrude12 (cut)
    with BuildSketch(Plane(origin=(200, 0, 0), x_dir=(0, 0, -1), z_dir=(1, 0, 0))):
        with Locations((15, 22.625)):
            Rectangle(SKETCH24_W, SKETCH24_H)
        with Locations((15, 52.375)):
            Rectangle(SKETCH24_W, SKETCH24_H)
    extrude(amount=-CUT_EXTRUDE12_DEPTH, mode=Mode.SUBTRACT)

    # Sketch25 → Boss-Extrude8 (add)
    with BuildSketch(Plane(origin=(200, 0, 0), x_dir=(0, 0, -1), z_dir=(1, 0, 0))):
        with Locations((15, 59.925)):
            Rectangle(SKETCH25_W, SKETCH25_H)
        with Locations((15, 30.175)):
            Rectangle(SKETCH25_W, SKETCH25_H)
    extrude(amount=-BOSS_EXTRUDE8_DEPTH)

    # Sketch26 → Boss-Extrude9 (add)
    with BuildSketch(Plane(origin=(200, 0, 0), x_dir=(0, 0, -1), z_dir=(1, 0, 0))):
        with Locations((11.05, 52.175)):
            Rectangle(SKETCH26_W, SKETCH26_H)
        with Locations((18.95, 52.175)):
            Rectangle(SKETCH26_W, SKETCH26_H)
        with Locations((18.95, 22.425)):
            Rectangle(SKETCH26_W, SKETCH26_H)
        with Locations((11.05, 22.425)):
            Rectangle(SKETCH26_W, SKETCH26_H)
    extrude(amount=-BOSS_EXTRUDE9_DEPTH)

    # Sketch27 → Boss-Extrude10 (add)
    with BuildSketch(Plane(origin=(200, 0, 0), x_dir=(0, 0, -1), z_dir=(1, 0, 0))):
        Polygon((18.05, 22.425), (18.9, 22.425), (18.9, 29.975), (11.1, 29.975), (11.1, 22.425), (11.95, 22.425), (11.95, 29.125), (15, 29.125), (18.05, 29.125), align=None)
        Polygon((18.9, 14.875), (18.9, 22.425), (18.05, 22.425), (18.05, 15.725), (11.95, 15.725), (11.95, 22.425), (11.1, 22.425), (11.1, 14.875), align=None)
        Polygon((18.9, 44.625), (18.9, 52.175), (18.05, 52.175), (18.05, 45.475), (11.95, 45.475), (11.95, 52.175), (11.1, 52.175), (11.1, 44.625), align=None)
        Polygon((18.05, 52.175), (18.9, 52.175), (18.9, 59.725), (11.1, 59.725), (11.1, 52.175), (11.95, 52.175), (11.95, 58.875), (15, 58.875), (18.05, 58.875), align=None)
    extrude(amount=-BOSS_EXTRUDE10_DEPTH)

    # Sketch28 → Boss-Extrude11 (add)
    with BuildSketch(Plane(origin=(0, 0, -5), x_dir=(-1, 0, 0), z_dir=(0, 0, -1))):
        with Locations((-176.768468334, 36.353971187)):
            Rectangle(SKETCH28_W, SKETCH28_H)
    extrude(amount=-BOSS_EXTRUDE11_DEPTH)

    # Sketch29 → Boss-Extrude12 (add)
    with BuildSketch(Plane.XY.offset(BOSS_EXTRUDE12_START)):
        with Locations(Location((168, 62.125, 0), (0, 0, 180))):
            Circle(SKETCH29_R)
        with Locations(Location((168, 12.125, 0), (0, 0, 180))):
            Circle(SKETCH29_R)
    extrude(amount=BOSS_EXTRUDE12_DEPTH)


solid = part.part
